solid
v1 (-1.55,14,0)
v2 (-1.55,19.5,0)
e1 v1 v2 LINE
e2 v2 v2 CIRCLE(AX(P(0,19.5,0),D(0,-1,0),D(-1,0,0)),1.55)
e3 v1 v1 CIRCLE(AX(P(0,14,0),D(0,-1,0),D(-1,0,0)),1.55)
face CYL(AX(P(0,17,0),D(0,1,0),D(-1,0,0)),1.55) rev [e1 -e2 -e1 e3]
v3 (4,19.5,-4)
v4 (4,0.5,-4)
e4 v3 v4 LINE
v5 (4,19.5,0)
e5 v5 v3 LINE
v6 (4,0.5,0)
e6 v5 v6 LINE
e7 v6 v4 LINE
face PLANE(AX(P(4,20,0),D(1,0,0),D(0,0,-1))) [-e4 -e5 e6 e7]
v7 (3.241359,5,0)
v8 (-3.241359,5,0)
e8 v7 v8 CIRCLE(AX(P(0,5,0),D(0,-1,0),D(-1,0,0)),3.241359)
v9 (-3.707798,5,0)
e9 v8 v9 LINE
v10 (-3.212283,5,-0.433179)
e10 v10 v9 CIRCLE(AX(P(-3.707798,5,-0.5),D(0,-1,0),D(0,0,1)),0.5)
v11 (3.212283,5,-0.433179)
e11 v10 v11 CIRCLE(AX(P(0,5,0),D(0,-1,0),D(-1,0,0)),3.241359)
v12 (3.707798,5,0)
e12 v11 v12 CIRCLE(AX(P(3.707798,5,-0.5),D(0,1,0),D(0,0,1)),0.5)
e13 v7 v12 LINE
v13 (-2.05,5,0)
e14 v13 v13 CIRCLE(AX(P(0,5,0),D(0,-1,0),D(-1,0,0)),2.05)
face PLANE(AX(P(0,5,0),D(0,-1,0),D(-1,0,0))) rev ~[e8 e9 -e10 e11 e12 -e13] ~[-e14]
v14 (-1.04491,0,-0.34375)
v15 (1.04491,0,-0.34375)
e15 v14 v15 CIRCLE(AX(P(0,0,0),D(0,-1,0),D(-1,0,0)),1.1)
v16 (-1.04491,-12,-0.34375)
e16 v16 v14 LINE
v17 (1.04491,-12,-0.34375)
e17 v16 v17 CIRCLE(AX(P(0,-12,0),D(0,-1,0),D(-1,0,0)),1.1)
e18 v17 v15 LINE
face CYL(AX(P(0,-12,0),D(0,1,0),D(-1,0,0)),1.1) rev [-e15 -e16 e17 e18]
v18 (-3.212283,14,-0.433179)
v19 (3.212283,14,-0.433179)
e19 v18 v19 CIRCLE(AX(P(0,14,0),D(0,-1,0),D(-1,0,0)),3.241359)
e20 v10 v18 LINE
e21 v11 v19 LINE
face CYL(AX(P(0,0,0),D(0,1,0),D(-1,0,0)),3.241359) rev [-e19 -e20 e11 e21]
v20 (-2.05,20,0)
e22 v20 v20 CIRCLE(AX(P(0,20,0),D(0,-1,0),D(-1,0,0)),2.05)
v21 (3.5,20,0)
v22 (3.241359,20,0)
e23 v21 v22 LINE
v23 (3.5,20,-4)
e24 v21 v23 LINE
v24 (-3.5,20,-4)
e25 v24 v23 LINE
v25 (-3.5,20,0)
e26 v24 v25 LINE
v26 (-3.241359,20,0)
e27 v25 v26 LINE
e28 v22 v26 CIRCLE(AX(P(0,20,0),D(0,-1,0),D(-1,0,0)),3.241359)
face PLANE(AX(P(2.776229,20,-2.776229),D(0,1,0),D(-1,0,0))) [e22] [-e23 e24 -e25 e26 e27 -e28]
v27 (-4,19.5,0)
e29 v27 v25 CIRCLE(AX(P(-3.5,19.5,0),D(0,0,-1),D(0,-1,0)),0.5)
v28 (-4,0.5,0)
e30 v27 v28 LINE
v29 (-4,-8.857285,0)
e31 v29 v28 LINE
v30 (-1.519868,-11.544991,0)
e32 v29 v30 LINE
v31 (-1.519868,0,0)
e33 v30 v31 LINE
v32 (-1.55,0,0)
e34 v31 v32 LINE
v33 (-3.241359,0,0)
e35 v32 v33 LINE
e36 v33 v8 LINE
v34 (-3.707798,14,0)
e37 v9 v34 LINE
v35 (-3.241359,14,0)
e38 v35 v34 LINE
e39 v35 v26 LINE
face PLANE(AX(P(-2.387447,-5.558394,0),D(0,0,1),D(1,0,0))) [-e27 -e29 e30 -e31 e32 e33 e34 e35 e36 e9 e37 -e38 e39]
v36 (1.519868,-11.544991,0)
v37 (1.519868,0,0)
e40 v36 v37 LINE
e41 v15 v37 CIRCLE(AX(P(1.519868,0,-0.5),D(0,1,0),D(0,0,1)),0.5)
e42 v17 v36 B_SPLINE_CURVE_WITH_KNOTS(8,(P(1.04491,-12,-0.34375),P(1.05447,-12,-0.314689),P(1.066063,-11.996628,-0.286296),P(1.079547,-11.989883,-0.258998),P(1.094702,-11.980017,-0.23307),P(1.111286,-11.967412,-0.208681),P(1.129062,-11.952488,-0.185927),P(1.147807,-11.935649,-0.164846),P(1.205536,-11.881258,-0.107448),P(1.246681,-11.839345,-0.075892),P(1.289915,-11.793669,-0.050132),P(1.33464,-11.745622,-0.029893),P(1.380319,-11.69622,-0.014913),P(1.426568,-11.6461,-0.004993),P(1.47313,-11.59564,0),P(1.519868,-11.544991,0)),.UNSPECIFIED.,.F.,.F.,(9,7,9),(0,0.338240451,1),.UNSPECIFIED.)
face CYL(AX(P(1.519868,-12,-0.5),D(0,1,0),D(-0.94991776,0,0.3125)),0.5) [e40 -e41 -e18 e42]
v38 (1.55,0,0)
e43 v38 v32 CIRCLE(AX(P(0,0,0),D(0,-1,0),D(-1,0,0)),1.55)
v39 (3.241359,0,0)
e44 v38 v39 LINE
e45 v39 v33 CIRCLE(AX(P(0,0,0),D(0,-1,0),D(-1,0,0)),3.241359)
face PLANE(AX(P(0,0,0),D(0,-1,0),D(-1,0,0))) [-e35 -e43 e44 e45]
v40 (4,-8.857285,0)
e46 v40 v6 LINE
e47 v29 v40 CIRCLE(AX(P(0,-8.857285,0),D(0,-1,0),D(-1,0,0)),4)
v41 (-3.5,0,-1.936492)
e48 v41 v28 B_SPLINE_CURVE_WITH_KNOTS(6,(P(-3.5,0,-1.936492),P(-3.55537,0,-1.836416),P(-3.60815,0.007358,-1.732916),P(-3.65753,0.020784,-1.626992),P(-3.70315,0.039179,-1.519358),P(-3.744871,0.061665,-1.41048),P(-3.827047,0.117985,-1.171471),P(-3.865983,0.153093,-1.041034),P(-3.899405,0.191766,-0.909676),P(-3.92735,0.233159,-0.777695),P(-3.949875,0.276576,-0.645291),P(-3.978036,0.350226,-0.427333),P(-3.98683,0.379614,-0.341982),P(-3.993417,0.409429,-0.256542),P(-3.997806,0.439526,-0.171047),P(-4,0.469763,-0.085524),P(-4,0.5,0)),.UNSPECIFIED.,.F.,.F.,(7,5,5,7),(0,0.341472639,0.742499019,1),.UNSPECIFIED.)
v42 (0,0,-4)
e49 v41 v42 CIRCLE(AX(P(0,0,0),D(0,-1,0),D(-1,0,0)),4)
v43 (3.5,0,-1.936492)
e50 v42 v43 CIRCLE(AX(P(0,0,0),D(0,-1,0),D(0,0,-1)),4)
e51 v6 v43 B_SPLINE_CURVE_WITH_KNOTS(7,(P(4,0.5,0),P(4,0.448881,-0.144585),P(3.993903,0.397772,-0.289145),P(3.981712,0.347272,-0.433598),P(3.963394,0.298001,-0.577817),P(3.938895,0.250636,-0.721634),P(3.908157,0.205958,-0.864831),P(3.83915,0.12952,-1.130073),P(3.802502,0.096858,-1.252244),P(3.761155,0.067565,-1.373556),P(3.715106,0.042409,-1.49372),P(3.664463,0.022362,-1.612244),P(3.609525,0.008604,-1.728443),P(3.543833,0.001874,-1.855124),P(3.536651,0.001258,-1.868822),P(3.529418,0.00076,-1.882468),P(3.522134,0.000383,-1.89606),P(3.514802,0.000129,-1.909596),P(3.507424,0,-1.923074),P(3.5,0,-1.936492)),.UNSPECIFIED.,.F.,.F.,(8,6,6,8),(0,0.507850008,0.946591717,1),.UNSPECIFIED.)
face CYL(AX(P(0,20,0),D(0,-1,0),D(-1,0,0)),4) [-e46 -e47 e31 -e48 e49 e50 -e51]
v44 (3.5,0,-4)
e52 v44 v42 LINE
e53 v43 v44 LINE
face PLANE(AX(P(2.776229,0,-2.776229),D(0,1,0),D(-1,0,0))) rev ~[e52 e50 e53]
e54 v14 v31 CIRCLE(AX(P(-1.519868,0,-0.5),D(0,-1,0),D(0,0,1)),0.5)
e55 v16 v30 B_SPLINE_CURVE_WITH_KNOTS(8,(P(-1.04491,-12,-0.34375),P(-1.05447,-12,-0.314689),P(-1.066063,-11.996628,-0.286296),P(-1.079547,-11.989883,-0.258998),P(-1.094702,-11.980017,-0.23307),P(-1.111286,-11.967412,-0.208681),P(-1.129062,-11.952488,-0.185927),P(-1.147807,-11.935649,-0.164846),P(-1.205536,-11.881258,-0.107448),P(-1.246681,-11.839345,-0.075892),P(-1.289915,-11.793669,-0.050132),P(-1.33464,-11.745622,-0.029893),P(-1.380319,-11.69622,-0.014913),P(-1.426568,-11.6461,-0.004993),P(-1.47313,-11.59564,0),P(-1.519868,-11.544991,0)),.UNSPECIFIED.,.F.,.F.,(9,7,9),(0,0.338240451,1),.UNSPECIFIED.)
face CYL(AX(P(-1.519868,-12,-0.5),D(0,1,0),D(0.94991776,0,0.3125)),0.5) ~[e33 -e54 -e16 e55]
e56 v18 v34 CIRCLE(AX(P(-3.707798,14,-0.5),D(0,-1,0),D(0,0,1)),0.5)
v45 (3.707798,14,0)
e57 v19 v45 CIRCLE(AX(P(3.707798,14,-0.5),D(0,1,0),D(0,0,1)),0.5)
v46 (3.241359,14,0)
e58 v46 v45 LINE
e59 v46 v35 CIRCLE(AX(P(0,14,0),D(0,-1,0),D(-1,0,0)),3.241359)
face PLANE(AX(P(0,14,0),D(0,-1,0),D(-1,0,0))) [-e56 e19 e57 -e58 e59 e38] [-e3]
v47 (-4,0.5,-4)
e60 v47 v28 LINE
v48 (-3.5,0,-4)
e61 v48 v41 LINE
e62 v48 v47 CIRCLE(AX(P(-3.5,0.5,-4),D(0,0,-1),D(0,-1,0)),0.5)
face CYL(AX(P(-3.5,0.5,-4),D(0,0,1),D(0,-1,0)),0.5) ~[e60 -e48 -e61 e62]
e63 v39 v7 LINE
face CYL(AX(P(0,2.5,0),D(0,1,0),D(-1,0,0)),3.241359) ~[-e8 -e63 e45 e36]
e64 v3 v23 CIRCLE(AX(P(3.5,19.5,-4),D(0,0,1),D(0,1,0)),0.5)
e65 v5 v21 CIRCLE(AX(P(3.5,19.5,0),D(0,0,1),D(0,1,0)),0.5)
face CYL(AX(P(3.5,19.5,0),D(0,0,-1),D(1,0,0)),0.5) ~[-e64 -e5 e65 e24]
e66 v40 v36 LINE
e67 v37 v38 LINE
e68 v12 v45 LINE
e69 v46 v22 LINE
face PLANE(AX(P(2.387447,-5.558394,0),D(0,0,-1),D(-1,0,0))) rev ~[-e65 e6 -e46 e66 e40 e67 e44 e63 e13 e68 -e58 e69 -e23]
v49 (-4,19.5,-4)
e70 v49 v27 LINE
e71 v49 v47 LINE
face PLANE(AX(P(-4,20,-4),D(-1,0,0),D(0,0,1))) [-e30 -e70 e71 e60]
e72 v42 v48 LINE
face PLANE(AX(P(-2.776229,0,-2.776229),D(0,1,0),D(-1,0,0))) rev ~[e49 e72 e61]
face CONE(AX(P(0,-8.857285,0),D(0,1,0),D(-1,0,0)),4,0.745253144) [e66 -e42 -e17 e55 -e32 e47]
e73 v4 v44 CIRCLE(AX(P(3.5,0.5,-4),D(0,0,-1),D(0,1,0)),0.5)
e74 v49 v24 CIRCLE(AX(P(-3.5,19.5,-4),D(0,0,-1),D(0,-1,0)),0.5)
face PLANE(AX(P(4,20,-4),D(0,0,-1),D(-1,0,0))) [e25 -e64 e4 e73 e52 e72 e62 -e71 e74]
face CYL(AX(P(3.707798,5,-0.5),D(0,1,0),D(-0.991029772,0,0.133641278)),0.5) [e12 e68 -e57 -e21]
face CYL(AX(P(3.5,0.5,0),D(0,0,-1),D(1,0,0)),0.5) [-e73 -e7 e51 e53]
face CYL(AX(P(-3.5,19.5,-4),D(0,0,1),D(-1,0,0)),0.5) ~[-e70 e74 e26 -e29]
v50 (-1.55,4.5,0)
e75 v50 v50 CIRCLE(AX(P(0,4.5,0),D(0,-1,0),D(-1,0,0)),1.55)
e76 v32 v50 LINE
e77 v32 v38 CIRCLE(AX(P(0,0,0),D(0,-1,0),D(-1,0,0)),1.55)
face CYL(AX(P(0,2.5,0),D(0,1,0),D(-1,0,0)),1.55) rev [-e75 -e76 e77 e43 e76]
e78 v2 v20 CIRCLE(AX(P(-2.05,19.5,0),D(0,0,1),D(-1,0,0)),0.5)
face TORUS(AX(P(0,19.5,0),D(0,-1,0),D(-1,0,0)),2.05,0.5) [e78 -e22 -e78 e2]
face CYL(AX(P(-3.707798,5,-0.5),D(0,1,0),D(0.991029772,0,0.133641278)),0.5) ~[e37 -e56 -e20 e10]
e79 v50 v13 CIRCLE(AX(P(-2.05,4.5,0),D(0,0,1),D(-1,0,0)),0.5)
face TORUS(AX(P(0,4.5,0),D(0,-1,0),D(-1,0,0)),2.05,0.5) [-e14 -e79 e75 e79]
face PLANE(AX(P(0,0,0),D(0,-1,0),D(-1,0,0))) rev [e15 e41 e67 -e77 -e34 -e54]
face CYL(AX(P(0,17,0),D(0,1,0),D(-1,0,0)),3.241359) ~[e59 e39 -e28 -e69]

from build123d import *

# Parameters (mm, degrees)
F0_W     = 0.7586409766
F0_H     = 4.9999998882
F0_H_2   = 9
F0_H_3   = 6.0000001118
F1_ANGLE = 180
F0_W_2   = 1.6913590234
F4_DEPTH = 20
F5_R     = 0.5


with BuildPart() as f1:
    # F0 (on Top) → F1 (revolve)
    with BuildSketch(Plane.XY):
        Polygon((-4, -8.8572846726), (-1.1, -12), (-1.1, 0), (-1.55, 0), (-3.2413590234, 0), (-4, 0), align=None)
        with Locations((-3.6206795117, 2.4999999441)):
            Rectangle(F0_W, F0_H)
        with Locations((-3.6206795117, 9.4999998882)):
            Rectangle(F0_W, F0_H_2)
        with Locations((-3.6206795117, 16.9999999441)):
            Rectangle(F0_W, F0_H_3)
    revolve(axis=Axis((0, 4.4247480631, 0), (0, -1, 0)), revolution_arc=F1_ANGLE)

    # F0 (on Top) → F2 (revolve)
    with BuildSketch(Plane.XY):
        with Locations((-2.3956795117, 2.4999999441)):
            Rectangle(F0_W_2, F0_H)
        with Locations((-2.3956795117, 16.9999999441)):
            Rectangle(F0_W_2, F0_H_3)
    revolve(axis=Axis((0, 4.4247480631, 0), (0, -1, 0)))

    # F3 (on face) → F4 (join)
    with BuildSketch(Plane(origin=(0, 20, 0), x_dir=(-1, 0, 0), z_dir=(0, 1, 0))):
        with BuildLine():
            ThreePointArc((0, -4), (-2.8284271247, -2.8284271247), (-4, 0))
            Line((-4, 0), (-4, -4))
            Line((-4, -4), (0, -4))
        make_face()
        with BuildLine():
            ThreePointArc((4, 0), (2.8284271247, -2.8284271247), (0, -4))
            Line((0, -4), (4, -4))
            Line((4, -4), (4, 0))
        make_face()
    extrude(amount=-F4_DEPTH)

    # F5
    f5_edges = [f1.edges().sort_by_distance(p)[0] for p in [
        (1.1, -6, 0),
        (-1.1, -6, 0),
        (1.55, 5, 0),
        (1.55, 20, 0),
        (3.241359, 9.5, 0),
        (-3.241359, 9.5, 0),
        (4, 20, -2),
        (-4, 20, -2),
        (4, 0, -2),
        (-4, 0, -2),
    ]]
    fillet(f5_edges, radius=F5_R)


solid = f1.part
